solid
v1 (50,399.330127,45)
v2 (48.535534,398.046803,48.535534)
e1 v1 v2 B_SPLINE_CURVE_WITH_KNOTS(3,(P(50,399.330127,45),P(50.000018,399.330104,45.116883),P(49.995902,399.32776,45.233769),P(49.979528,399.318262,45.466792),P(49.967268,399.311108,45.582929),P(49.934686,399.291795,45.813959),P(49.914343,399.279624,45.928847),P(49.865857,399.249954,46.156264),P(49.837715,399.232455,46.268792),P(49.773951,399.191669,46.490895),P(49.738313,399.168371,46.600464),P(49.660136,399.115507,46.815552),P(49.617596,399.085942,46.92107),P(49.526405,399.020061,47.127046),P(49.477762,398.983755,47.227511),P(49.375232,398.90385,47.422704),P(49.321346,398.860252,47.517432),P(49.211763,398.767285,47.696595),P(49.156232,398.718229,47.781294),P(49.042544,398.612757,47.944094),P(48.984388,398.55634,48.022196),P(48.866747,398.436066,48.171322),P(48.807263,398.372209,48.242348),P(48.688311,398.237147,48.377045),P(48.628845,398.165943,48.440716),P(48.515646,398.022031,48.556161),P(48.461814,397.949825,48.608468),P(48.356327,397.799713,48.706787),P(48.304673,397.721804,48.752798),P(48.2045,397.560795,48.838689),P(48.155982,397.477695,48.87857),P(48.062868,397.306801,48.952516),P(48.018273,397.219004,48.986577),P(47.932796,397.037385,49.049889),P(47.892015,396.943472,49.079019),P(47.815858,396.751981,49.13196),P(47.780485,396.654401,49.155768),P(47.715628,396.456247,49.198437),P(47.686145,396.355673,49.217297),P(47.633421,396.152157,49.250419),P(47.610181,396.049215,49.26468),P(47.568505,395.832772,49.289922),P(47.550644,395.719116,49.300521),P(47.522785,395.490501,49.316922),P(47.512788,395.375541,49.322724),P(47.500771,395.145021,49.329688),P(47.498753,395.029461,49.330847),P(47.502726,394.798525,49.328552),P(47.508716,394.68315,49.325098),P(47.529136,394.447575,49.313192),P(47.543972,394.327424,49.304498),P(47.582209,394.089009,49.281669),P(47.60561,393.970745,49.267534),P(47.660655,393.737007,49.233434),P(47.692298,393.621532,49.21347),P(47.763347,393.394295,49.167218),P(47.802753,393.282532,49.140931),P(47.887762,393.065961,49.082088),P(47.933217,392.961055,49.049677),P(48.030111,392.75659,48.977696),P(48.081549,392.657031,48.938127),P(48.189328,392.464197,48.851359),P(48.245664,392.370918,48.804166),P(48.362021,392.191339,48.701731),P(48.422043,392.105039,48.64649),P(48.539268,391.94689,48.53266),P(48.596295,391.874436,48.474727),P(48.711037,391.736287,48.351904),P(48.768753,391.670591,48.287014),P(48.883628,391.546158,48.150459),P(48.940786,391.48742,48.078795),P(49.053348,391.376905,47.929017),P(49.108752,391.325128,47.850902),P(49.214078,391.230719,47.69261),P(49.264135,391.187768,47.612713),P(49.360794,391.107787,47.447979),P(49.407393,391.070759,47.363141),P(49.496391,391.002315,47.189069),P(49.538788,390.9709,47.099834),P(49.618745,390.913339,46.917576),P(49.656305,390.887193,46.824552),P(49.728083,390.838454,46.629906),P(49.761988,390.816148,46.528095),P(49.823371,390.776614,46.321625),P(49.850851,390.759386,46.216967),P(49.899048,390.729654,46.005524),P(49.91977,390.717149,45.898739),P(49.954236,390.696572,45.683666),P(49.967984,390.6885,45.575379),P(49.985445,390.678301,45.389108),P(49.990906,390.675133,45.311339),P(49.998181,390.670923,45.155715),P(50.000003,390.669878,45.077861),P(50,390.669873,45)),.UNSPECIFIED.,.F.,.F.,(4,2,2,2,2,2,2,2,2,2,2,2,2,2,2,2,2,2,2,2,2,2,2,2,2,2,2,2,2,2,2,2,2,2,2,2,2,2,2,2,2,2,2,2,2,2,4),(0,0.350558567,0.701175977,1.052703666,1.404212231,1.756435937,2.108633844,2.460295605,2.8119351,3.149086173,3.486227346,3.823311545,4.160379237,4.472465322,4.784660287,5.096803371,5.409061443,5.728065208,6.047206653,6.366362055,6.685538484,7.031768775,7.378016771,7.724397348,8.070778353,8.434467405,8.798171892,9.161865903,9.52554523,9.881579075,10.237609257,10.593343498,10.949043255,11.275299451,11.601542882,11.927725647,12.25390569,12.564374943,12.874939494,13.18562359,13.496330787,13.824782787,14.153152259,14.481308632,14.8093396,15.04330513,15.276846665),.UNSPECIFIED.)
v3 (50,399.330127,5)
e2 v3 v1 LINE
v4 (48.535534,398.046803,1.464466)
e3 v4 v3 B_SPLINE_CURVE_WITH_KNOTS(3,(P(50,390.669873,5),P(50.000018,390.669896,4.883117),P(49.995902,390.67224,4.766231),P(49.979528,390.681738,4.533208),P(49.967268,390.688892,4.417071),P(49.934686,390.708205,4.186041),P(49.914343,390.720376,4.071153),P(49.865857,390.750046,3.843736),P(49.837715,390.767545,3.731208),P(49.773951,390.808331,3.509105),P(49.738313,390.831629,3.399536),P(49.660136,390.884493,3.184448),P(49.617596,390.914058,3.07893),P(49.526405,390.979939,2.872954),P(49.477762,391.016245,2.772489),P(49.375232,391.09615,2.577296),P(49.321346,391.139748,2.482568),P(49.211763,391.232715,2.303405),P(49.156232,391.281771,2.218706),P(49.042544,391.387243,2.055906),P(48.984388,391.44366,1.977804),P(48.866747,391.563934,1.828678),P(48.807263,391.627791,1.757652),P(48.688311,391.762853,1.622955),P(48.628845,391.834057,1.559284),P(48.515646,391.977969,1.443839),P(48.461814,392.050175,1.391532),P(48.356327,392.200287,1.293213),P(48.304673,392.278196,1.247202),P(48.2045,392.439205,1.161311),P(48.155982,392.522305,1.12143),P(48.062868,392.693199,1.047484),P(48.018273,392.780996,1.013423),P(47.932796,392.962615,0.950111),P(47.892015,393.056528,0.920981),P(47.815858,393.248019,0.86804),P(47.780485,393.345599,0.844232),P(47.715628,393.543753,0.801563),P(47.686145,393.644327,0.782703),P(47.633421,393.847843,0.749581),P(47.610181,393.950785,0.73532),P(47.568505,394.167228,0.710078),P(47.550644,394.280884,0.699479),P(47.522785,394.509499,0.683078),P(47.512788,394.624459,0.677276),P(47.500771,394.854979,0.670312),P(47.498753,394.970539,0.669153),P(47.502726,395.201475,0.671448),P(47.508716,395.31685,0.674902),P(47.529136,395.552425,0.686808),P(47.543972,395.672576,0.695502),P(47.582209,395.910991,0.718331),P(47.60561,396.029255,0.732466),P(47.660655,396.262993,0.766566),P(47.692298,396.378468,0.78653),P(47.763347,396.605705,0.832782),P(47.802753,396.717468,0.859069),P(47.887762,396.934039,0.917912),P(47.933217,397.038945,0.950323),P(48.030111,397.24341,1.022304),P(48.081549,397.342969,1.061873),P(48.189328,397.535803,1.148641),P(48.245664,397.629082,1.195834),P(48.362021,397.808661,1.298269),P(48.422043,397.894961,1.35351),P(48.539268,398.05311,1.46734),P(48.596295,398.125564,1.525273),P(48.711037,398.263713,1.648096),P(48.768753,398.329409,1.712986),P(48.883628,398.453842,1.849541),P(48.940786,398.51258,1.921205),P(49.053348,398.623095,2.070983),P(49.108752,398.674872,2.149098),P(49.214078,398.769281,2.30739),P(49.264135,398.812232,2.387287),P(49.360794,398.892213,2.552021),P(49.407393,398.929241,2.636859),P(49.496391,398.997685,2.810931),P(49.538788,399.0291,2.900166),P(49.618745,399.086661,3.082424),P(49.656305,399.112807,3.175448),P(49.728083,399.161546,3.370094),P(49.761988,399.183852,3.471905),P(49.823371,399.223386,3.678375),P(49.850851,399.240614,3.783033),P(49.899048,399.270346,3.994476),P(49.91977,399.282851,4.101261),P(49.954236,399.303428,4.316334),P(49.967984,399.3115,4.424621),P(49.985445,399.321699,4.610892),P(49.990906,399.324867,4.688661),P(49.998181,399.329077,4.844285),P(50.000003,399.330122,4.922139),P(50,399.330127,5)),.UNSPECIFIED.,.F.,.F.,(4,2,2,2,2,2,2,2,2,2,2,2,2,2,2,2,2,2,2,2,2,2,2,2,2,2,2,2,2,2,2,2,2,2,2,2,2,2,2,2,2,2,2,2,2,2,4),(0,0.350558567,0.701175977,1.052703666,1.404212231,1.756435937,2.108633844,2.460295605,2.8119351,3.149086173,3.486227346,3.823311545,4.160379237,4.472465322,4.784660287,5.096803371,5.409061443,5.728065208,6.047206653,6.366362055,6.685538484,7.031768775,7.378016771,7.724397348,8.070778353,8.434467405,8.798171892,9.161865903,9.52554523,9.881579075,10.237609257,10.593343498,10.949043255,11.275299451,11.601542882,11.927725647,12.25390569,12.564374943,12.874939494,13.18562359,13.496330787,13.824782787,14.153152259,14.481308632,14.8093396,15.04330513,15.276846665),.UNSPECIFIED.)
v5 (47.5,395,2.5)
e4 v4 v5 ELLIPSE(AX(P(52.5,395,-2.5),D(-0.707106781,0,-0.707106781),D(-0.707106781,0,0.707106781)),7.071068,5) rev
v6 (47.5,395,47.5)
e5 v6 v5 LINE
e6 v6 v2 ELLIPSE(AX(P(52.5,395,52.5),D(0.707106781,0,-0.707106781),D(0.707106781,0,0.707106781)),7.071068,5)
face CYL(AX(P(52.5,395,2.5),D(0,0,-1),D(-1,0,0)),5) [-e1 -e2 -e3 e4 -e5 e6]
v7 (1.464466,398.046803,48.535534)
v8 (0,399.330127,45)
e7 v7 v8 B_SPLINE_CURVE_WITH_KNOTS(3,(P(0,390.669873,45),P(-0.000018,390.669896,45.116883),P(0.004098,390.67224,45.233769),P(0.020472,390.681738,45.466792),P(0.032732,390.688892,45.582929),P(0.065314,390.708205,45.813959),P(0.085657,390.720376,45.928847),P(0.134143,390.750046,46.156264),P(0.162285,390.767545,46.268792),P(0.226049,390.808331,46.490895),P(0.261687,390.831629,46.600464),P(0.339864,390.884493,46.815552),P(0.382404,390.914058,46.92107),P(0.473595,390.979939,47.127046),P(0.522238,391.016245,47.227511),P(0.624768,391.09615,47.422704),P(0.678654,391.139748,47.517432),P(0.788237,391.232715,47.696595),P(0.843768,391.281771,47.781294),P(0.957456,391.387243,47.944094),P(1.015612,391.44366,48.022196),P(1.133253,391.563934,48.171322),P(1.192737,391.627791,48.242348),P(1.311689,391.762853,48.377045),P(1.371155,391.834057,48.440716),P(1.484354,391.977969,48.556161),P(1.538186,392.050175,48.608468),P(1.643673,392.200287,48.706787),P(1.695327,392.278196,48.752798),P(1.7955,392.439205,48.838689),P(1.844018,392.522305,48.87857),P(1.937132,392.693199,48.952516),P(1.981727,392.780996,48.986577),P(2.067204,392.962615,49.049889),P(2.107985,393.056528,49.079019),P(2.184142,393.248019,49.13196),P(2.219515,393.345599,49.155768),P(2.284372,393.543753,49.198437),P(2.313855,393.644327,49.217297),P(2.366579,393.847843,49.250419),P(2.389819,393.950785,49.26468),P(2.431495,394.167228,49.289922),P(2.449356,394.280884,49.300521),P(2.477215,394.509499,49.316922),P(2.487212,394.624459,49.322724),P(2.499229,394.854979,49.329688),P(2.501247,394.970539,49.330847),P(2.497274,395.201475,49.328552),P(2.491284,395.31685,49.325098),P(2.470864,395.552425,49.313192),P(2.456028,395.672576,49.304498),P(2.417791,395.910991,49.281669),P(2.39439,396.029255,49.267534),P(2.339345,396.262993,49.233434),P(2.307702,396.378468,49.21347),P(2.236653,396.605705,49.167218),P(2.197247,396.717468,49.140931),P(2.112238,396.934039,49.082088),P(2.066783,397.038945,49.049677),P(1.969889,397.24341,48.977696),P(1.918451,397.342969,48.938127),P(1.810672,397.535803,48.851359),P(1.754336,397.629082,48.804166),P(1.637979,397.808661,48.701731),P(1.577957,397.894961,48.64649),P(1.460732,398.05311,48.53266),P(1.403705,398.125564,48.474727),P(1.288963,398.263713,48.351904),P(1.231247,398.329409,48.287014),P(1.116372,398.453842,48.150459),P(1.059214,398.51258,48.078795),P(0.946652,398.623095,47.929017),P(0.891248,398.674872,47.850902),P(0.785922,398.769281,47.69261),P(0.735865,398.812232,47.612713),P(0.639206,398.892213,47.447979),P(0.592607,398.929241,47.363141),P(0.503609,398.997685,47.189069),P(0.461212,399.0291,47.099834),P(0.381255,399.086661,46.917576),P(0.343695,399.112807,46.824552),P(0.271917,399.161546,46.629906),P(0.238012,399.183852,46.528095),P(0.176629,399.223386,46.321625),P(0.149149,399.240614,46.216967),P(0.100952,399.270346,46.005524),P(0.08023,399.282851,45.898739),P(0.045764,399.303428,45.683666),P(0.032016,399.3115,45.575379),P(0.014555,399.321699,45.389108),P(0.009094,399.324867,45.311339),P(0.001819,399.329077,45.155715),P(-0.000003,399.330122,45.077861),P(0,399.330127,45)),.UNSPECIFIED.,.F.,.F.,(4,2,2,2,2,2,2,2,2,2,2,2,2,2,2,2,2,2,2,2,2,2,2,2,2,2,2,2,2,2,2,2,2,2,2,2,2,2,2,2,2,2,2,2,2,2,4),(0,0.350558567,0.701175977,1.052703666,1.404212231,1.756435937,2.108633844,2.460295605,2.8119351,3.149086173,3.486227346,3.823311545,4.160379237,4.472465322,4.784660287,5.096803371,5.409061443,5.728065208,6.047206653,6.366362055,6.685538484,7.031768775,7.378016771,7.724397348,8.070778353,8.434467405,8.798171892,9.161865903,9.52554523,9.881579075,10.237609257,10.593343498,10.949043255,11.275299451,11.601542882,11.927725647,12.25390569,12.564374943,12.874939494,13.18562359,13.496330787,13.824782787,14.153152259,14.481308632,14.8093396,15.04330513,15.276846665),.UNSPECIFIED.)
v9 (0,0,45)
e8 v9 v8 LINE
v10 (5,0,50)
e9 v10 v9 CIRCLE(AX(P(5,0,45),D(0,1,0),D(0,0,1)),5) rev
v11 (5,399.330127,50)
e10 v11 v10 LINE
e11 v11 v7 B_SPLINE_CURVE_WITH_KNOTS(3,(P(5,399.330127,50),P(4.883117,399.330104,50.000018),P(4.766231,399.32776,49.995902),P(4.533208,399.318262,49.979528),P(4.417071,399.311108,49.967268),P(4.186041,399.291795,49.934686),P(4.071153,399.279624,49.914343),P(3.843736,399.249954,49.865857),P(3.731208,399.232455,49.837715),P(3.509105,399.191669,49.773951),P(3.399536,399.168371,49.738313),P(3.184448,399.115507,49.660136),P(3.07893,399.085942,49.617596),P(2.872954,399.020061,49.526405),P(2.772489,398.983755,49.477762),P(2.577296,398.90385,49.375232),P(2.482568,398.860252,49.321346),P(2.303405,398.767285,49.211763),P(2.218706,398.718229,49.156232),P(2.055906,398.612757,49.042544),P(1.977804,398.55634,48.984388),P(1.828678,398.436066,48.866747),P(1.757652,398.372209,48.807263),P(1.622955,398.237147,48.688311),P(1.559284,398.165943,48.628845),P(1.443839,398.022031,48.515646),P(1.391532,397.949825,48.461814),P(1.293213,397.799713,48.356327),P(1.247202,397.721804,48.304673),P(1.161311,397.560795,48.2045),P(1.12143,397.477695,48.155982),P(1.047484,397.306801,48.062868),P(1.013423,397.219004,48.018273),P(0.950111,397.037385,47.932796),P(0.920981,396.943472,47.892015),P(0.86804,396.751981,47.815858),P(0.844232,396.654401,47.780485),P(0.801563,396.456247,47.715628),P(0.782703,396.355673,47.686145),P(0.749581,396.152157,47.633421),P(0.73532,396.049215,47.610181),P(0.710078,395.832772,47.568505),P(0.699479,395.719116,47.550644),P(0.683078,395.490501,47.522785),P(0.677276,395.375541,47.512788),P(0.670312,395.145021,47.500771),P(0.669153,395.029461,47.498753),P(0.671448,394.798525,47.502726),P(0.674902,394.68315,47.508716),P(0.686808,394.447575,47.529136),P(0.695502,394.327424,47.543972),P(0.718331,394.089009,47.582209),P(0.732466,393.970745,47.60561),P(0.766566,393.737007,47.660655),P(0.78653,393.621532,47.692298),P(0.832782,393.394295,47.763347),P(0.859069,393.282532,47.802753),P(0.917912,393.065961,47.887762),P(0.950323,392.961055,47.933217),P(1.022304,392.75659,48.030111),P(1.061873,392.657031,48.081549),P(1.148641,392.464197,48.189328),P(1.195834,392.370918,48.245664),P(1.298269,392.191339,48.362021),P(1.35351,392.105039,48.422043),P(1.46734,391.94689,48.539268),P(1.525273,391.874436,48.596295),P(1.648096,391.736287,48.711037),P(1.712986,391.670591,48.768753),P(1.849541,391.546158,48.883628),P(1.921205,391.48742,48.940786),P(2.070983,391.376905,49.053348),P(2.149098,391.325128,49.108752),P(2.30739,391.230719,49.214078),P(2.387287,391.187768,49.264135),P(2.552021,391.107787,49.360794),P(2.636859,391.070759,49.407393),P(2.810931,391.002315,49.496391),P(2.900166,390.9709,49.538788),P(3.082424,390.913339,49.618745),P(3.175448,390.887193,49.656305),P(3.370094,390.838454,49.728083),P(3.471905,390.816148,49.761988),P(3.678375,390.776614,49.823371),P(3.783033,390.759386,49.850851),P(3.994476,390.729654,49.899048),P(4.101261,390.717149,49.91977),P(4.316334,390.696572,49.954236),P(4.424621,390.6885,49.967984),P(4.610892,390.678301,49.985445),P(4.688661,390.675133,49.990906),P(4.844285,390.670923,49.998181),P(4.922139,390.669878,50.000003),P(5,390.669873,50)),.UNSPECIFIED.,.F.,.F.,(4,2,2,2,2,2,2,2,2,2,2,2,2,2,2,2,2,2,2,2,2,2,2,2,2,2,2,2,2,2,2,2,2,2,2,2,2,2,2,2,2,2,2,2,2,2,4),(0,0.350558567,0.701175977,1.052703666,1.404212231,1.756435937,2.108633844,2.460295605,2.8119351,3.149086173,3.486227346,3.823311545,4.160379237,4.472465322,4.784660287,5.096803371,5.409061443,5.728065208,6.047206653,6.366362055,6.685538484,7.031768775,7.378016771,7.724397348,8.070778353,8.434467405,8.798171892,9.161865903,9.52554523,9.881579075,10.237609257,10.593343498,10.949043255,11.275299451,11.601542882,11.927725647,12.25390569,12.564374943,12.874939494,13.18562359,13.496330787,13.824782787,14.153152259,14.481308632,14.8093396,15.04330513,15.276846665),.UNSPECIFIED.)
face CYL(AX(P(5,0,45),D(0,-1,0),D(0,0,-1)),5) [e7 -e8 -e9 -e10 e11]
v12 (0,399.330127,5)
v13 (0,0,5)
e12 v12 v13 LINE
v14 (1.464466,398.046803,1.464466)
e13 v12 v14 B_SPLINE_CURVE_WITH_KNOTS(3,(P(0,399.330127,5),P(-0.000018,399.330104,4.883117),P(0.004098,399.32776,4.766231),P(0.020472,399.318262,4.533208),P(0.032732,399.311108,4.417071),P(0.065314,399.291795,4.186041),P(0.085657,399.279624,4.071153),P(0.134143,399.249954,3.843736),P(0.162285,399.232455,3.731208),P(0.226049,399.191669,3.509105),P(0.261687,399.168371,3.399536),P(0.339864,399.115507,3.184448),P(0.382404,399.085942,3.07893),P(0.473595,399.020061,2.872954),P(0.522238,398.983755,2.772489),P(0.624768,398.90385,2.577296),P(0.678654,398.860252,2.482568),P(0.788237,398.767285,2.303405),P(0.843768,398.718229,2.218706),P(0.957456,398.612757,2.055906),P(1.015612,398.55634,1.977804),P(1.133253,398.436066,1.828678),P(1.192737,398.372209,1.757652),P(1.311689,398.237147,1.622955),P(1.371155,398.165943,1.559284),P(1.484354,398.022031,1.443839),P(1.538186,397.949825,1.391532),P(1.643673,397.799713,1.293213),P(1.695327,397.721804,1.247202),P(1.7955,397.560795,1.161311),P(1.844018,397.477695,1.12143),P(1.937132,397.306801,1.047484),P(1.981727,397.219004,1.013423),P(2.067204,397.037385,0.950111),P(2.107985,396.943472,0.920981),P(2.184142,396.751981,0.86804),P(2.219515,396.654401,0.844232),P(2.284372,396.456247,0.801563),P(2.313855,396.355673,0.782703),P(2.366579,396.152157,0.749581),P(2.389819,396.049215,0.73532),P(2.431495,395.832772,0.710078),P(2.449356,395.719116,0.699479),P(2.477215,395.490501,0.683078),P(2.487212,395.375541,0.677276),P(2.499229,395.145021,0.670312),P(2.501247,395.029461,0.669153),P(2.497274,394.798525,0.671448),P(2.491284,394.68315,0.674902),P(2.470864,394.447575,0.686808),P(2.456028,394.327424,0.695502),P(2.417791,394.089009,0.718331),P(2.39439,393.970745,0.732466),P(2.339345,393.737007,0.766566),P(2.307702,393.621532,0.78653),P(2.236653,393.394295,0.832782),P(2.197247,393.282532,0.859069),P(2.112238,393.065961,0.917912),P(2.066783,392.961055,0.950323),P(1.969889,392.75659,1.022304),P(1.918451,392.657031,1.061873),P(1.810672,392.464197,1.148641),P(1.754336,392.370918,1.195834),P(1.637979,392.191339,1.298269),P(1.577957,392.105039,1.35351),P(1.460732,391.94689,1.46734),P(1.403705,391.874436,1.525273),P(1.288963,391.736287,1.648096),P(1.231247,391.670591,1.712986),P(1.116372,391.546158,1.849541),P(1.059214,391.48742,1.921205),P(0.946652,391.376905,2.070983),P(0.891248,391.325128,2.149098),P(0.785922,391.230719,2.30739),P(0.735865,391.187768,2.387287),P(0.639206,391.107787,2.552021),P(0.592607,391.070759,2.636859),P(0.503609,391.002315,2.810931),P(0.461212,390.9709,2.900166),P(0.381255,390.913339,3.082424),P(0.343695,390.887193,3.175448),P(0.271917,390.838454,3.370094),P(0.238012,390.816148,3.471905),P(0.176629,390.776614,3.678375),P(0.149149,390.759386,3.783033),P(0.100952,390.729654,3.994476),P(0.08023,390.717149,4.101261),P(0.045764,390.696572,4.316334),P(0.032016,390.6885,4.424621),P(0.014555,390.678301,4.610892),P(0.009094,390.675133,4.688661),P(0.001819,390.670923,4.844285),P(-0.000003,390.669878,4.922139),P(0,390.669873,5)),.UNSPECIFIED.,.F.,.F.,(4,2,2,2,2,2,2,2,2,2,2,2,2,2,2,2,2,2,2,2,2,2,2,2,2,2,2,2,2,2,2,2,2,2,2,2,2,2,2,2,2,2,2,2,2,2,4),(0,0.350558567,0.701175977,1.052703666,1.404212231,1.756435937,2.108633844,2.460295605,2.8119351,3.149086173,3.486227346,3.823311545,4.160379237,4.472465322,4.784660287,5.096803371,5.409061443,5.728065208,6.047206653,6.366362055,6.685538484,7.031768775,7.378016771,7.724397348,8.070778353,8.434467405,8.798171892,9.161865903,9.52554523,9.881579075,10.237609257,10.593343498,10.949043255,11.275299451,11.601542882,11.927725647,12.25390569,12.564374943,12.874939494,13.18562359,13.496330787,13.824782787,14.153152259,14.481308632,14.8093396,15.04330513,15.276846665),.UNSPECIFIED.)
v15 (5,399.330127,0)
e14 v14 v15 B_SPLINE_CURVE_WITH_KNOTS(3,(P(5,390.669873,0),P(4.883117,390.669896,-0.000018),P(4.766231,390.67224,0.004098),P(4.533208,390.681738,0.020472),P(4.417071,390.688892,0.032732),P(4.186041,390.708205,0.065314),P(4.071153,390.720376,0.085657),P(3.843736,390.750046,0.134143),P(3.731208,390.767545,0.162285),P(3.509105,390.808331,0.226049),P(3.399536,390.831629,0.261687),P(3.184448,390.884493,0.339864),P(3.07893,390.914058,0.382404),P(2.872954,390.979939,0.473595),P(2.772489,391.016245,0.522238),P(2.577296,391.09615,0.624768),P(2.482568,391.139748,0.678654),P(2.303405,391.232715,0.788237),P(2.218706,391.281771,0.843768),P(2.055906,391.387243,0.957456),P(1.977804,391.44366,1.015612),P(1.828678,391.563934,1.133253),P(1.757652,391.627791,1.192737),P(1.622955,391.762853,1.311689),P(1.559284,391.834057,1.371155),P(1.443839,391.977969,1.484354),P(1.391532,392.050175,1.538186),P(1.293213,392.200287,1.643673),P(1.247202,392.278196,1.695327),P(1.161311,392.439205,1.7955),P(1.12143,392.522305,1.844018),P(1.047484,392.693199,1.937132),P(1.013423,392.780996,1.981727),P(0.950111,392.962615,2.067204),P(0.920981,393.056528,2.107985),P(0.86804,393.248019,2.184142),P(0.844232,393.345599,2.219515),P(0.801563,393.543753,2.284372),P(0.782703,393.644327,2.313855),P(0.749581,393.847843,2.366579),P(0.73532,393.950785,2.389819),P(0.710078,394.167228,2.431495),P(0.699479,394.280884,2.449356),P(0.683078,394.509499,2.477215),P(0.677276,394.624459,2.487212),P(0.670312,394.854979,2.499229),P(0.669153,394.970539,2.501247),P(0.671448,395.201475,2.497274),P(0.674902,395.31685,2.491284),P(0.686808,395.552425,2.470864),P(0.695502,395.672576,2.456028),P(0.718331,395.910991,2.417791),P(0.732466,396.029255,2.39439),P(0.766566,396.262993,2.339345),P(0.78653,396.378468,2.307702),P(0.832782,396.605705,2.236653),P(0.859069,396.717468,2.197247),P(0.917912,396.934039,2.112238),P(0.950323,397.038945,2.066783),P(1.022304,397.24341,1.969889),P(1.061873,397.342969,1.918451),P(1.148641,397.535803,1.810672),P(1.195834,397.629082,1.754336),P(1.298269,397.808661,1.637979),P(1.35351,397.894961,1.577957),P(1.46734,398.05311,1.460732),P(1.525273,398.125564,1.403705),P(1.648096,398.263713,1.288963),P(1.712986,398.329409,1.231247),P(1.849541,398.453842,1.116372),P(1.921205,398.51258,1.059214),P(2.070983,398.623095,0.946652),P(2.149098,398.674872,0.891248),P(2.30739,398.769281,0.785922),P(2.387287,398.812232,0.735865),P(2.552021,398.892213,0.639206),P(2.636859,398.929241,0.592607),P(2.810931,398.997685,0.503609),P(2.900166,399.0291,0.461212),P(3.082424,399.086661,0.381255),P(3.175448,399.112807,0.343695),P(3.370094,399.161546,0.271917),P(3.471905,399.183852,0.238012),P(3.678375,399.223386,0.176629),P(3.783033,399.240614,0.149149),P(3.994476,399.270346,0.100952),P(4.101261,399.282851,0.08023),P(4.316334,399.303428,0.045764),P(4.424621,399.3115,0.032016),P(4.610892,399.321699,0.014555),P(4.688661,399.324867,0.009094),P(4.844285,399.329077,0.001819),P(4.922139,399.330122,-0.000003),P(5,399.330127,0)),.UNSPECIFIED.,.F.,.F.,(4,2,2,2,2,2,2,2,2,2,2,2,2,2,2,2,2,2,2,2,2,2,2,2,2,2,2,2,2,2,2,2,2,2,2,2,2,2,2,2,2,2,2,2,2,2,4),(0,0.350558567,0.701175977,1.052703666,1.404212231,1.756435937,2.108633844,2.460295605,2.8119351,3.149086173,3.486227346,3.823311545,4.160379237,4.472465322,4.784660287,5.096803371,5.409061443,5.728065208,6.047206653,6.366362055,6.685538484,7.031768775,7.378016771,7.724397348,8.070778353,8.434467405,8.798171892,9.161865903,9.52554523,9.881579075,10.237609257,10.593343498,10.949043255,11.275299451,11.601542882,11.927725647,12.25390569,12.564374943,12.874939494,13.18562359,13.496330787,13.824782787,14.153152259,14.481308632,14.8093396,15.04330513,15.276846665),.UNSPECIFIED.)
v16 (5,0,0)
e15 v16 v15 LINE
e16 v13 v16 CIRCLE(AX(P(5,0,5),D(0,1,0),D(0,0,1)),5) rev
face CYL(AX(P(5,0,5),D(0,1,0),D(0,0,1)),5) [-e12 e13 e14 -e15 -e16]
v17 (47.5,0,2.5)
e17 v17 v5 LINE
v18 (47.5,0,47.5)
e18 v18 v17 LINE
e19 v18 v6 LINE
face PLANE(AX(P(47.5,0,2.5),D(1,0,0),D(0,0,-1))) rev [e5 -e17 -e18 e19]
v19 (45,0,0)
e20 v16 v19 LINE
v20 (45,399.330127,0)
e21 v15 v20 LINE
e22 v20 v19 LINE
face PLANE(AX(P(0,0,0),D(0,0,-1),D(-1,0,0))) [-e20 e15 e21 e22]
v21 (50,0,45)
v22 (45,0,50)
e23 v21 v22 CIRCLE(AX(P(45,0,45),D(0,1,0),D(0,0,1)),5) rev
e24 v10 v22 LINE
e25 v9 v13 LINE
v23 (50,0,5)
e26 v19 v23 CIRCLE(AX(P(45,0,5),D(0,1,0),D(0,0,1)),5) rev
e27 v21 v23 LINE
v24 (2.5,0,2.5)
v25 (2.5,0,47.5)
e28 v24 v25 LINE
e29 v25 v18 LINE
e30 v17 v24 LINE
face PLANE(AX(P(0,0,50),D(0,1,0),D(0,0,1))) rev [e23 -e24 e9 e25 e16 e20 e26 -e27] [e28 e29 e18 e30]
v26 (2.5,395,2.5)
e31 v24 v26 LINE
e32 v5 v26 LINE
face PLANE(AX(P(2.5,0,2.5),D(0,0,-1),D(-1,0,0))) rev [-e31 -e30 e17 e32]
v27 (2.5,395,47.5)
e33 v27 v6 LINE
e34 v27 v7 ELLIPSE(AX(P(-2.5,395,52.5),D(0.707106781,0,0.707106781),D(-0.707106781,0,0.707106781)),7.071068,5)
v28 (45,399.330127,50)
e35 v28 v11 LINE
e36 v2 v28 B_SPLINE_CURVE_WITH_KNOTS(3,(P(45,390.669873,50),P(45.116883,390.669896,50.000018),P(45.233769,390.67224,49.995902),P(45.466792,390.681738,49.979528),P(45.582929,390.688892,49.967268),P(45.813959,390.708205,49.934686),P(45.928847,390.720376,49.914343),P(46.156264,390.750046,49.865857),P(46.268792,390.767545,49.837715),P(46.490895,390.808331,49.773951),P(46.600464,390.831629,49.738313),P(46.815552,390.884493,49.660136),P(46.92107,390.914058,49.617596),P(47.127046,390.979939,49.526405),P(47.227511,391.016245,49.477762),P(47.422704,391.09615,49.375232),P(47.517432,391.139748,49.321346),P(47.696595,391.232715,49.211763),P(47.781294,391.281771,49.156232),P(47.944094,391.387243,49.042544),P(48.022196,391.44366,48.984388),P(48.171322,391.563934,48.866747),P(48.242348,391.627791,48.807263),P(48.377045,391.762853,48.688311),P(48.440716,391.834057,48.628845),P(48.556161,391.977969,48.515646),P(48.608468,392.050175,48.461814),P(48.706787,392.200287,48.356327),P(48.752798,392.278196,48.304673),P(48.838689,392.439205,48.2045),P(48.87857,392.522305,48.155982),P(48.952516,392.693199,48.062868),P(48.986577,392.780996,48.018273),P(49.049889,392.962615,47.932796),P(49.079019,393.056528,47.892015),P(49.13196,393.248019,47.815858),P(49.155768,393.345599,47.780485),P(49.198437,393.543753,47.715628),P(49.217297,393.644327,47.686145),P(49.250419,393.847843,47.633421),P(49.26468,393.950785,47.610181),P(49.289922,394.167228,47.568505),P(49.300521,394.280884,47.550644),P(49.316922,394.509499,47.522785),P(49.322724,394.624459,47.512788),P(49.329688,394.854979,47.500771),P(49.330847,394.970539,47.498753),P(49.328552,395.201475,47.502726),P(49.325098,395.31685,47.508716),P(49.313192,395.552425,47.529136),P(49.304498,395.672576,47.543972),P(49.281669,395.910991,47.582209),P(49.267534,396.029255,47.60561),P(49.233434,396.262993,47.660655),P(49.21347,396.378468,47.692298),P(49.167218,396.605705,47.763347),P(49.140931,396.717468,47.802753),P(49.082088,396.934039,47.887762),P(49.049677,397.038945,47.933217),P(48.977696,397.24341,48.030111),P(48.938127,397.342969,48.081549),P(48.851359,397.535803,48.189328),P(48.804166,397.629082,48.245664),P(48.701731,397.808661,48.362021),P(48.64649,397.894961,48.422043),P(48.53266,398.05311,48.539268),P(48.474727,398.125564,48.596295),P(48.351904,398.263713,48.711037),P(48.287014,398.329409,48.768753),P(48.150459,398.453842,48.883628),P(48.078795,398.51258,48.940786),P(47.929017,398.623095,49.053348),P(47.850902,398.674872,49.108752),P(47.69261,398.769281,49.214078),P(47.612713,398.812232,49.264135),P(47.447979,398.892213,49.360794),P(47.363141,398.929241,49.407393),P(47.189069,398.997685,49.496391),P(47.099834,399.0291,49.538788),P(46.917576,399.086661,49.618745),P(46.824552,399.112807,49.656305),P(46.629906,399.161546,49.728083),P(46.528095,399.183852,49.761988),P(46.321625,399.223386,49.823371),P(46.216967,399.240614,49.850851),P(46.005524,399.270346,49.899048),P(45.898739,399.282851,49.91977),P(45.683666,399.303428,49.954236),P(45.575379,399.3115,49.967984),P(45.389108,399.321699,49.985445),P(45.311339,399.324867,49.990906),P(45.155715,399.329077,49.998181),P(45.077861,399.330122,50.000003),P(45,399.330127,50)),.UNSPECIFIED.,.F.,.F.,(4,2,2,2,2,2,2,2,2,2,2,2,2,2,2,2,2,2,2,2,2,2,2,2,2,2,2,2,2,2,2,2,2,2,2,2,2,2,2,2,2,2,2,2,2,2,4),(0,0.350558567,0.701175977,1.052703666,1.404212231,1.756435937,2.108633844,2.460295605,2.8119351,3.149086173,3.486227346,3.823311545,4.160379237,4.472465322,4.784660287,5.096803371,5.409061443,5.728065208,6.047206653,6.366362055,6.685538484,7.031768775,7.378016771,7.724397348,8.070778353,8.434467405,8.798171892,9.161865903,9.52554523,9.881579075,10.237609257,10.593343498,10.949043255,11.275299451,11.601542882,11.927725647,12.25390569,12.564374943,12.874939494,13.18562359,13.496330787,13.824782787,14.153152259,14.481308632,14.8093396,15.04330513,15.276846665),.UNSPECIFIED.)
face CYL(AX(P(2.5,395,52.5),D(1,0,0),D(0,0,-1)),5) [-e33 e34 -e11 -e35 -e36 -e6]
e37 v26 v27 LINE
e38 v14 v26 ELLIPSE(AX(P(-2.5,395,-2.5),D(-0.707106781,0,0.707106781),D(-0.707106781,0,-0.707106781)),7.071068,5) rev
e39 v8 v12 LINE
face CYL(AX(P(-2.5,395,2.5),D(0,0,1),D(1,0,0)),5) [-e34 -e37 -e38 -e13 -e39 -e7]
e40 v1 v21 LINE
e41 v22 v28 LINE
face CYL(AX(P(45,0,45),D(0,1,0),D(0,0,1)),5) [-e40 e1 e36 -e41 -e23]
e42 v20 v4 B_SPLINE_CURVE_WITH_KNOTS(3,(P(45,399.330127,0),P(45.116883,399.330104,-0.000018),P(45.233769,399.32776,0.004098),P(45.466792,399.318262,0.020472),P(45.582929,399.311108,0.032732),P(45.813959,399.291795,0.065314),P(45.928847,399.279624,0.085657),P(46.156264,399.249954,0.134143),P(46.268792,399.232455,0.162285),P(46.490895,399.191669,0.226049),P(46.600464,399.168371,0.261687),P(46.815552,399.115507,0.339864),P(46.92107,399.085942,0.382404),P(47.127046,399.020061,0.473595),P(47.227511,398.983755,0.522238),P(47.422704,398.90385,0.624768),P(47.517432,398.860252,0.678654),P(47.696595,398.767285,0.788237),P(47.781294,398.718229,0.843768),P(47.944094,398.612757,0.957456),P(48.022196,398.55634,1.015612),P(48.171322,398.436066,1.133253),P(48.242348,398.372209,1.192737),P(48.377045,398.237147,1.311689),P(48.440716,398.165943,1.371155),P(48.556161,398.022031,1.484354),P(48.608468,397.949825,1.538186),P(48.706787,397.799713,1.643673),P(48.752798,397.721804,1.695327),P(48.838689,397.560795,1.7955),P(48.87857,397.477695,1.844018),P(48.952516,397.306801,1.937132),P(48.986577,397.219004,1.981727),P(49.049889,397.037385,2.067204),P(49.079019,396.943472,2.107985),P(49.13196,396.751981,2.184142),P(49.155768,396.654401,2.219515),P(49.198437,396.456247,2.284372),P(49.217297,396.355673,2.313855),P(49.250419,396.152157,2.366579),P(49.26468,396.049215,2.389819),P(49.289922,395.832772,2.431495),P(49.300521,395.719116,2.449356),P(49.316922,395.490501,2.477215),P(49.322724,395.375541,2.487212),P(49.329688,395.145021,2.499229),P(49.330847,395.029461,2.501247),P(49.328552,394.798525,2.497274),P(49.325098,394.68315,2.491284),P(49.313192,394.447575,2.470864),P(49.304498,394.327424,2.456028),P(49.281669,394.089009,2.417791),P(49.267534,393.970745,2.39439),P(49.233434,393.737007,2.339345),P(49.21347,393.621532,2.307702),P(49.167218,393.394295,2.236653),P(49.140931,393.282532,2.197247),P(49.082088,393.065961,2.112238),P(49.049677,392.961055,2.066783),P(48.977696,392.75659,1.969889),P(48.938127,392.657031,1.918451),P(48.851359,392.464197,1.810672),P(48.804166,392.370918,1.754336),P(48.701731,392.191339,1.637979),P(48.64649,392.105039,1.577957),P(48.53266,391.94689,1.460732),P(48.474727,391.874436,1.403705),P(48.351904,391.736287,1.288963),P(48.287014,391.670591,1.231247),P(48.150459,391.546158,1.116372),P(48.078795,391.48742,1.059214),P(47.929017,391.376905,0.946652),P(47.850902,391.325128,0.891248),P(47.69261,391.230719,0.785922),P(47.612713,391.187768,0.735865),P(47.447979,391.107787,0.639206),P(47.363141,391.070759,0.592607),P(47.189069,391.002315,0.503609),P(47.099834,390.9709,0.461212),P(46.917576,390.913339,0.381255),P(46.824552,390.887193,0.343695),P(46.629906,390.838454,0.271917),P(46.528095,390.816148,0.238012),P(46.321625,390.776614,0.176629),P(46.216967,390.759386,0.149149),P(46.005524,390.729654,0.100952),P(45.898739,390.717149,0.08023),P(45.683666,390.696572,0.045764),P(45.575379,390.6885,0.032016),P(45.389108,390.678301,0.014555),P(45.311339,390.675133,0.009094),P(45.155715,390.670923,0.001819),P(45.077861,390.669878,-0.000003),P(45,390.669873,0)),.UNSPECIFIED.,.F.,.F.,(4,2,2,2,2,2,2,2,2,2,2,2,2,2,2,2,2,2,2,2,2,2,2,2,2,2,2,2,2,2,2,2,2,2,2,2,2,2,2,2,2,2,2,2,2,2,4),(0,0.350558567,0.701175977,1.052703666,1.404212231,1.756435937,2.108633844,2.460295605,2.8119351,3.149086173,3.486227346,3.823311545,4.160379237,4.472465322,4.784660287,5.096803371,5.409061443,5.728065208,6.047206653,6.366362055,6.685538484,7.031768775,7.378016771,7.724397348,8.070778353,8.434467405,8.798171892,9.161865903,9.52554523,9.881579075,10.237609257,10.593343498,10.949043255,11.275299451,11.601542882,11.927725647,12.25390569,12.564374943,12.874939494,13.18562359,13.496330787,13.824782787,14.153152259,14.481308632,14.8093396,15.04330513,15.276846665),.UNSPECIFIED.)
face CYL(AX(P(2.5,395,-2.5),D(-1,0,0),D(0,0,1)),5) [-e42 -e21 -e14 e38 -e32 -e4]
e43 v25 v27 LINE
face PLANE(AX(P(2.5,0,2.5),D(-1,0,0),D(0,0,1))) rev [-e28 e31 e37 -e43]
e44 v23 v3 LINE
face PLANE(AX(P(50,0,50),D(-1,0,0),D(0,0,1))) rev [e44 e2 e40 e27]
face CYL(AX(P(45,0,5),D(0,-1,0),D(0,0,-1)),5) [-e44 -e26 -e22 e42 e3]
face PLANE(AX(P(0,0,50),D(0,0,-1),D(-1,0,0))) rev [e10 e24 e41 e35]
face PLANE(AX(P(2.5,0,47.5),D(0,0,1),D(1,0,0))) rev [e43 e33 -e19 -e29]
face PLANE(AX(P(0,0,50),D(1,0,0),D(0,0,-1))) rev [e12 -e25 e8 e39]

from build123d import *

# Parameters (mm, degrees)
SKETCH1_W           = 50
SKETCH1_H           = 400
BOSS_EXTRUDE1_DEPTH = 50
SKETCH2_W           = 45
SKETCH2_H           = 45
CUT_EXTRUDE1_DEPTH  = 407.201920232
FILLET1_R           = 5
FILLET2_R           = 5


with BuildPart() as part:
    # Sketch1 → Boss-Extrude1 (new body)
    with BuildSketch(Plane.XY):
        with Locations((25, 200)):
            Rectangle(SKETCH1_W, SKETCH1_H)
    extrude(amount=BOSS_EXTRUDE1_DEPTH)

    # Sketch2 → Cut-Extrude1 (cut, through all)
    with BuildSketch(Plane(origin=(0, 400, 0), x_dir=(1, 0, 0), z_dir=(0, 1, 0))):
        with Locations((25, -25)):
            Rectangle(SKETCH2_W, SKETCH2_H)
    extrude(amount=-CUT_EXTRUDE1_DEPTH, mode=Mode.SUBTRACT)

    # Fillet1
    fillet1_edges = [part.edges().sort_by_distance(p)[0] for p in [
        (50, 200, 50),
        (0, 200, 50),
        (50, 200, 0),
        (0, 200, 0),
    ]]
    fillet(fillet1_edges, radius=FILLET1_R)

    # Fillet2
    # the kernel refuses this fillet: 5 mm, written as the material it takes off along each edge
    with BuildSketch(Plane(origin=(47.5, 400, 2.5), x_dir=(0, -1, 0), z_dir=(0, 0, 1)), Plane(origin=(47.5, 400, 47.5), x_dir=(0, -1, 0), z_dir=(-1, 0, 0)), Plane(origin=(2.5, 400, 47.5), x_dir=(0, -1, 0), z_dir=(0, 0, -1)), Plane(origin=(2.5, 400, 2.5), x_dir=(0, -1, 0), z_dir=(1, 0, 0))) as fillet2_piece_1:
        with BuildLine():
            CenterArc((FILLET2_R, FILLET2_R), FILLET2_R, 180, 90)
            Line((0, FILLET2_R), (-FILLET2_R * 0.02, FILLET2_R))
            Line((-FILLET2_R * 0.02, FILLET2_R), (-FILLET2_R * 0.02, -FILLET2_R * 0.02))
            Line((-FILLET2_R * 0.02, -FILLET2_R * 0.02), (FILLET2_R, -FILLET2_R * 0.02))
            Line((FILLET2_R, -FILLET2_R * 0.02), (FILLET2_R, 0))
        make_face()
    extrude(amount=45, mode=Mode.SUBTRACT)
    with BuildSketch(Plane(origin=(47.5, 400, -10), x_dir=(0, -1, 0), z_dir=(0, 0, 1))) as fillet2_piece_2a_section:
        with BuildLine():
            CenterArc((FILLET2_R, FILLET2_R), FILLET2_R, 180, 90)
            Line((0, FILLET2_R), (-FILLET2_R * 0.02, FILLET2_R))
            Line((-FILLET2_R * 0.02, FILLET2_R), (-FILLET2_R * 0.02, -FILLET2_R * 0.02))
            Line((-FILLET2_R * 0.02, -FILLET2_R * 0.02), (FILLET2_R, -FILLET2_R * 0.02))
            Line((FILLET2_R, -FILLET2_R * 0.02), (FILLET2_R, 0))
        make_face()
    fillet2_piece_2a = extrude(amount=57.5, mode=Mode.PRIVATE)
    fillet2_piece_2a = split(fillet2_piece_2a, bisect_by=Plane(origin=(48.631975571, 398.868024429, 2.5), z_dir=(0, 0, -1)), keep=Keep.TOP, mode=Mode.PRIVATE)
    with BuildSketch(Plane(origin=(2.5, 400, 2.5), x_dir=(0, -1, 0), z_dir=(1, 0, 0))) as fillet2_piece_2b_section:
        with BuildLine():
            CenterArc((FILLET2_R, FILLET2_R), FILLET2_R, 180, 90)
            Line((0, FILLET2_R), (-FILLET2_R * 0.02, FILLET2_R))
            Line((-FILLET2_R * 0.02, FILLET2_R), (-FILLET2_R * 0.02, -FILLET2_R * 0.02))
            Line((-FILLET2_R * 0.02, -FILLET2_R * 0.02), (FILLET2_R, -FILLET2_R * 0.02))
            Line((FILLET2_R, -FILLET2_R * 0.02), (FILLET2_R, 0))
        make_face()
    fillet2_piece_2b = extrude(amount=57.5, mode=Mode.PRIVATE)
    fillet2_piece_2b = split(fillet2_piece_2b, bisect_by=Plane(origin=(47.5, 398.868024429, 1.368024429), z_dir=(1, 0, 0)), keep=Keep.TOP, mode=Mode.PRIVATE)
    fillet2_piece_2 = fillet2_piece_2a & fillet2_piece_2b
    add(fillet2_piece_2, mode=Mode.SUBTRACT)
    with BuildSketch(Plane(origin=(60, 400, 47.5), x_dir=(0, -1, 0), z_dir=(-1, 0, 0))) as fillet2_piece_3a_section:
        with BuildLine():
            CenterArc((FILLET2_R, FILLET2_R), FILLET2_R, 180, 90)
            Line((0, FILLET2_R), (-FILLET2_R * 0.02, FILLET2_R))
            Line((-FILLET2_R * 0.02, FILLET2_R), (-FILLET2_R * 0.02, -FILLET2_R * 0.02))
            Line((-FILLET2_R * 0.02, -FILLET2_R * 0.02), (FILLET2_R, -FILLET2_R * 0.02))
            Line((FILLET2_R, -FILLET2_R * 0.02), (FILLET2_R, 0))
        make_face()
    fillet2_piece_3a = extrude(amount=57.5, mode=Mode.PRIVATE)
    fillet2_piece_3a = split(fillet2_piece_3a, bisect_by=Plane(origin=(47.5, 398.868024429, 48.631975571), z_dir=(1, 0, 0)), keep=Keep.TOP, mode=Mode.PRIVATE)
    with BuildSketch(Plane(origin=(47.5, 400, 2.5), x_dir=(0, -1, 0), z_dir=(0, 0, 1))) as fillet2_piece_3b_section:
        with BuildLine():
            CenterArc((FILLET2_R, FILLET2_R), FILLET2_R, 180, 90)
            Line((0, FILLET2_R), (-FILLET2_R * 0.02, FILLET2_R))
            Line((-FILLET2_R * 0.02, FILLET2_R), (-FILLET2_R * 0.02, -FILLET2_R * 0.02))
            Line((-FILLET2_R * 0.02, -FILLET2_R * 0.02), (FILLET2_R, -FILLET2_R * 0.02))
            Line((FILLET2_R, -FILLET2_R * 0.02), (FILLET2_R, 0))
        make_face()
    fillet2_piece_3b = extrude(amount=57.5, mode=Mode.PRIVATE)
    fillet2_piece_3b = split(fillet2_piece_3b, bisect_by=Plane(origin=(48.631975571, 398.868024429, 47.5), z_dir=(0, 0, 1)), keep=Keep.TOP, mode=Mode.PRIVATE)
    fillet2_piece_3 = fillet2_piece_3a & fillet2_piece_3b
    add(fillet2_piece_3, mode=Mode.SUBTRACT)
    with BuildSketch(Plane(origin=(2.5, 400, 60), x_dir=(0, -1, 0), z_dir=(0, 0, -1))) as fillet2_piece_4a_section:
        with BuildLine():
            CenterArc((FILLET2_R, FILLET2_R), FILLET2_R, 180, 90)
            Line((0, FILLET2_R), (-FILLET2_R * 0.02, FILLET2_R))
            Line((-FILLET2_R * 0.02, FILLET2_R), (-FILLET2_R * 0.02, -FILLET2_R * 0.02))
            Line((-FILLET2_R * 0.02, -FILLET2_R * 0.02), (FILLET2_R, -FILLET2_R * 0.02))
            Line((FILLET2_R, -FILLET2_R * 0.02), (FILLET2_R, 0))
        make_face()
    fillet2_piece_4a = extrude(amount=57.5, mode=Mode.PRIVATE)
    fillet2_piece_4a = split(fillet2_piece_4a, bisect_by=Plane(origin=(1.368024429, 398.868024429, 47.5), z_dir=(0, 0, 1)), keep=Keep.TOP, mode=Mode.PRIVATE)
    with BuildSketch(Plane(origin=(47.5, 400, 47.5), x_dir=(0, -1, 0), z_dir=(-1, 0, 0))) as fillet2_piece_4b_section:
        with BuildLine():
            CenterArc((FILLET2_R, FILLET2_R), FILLET2_R, 180, 90)
            Line((0, FILLET2_R), (-FILLET2_R * 0.02, FILLET2_R))
            Line((-FILLET2_R * 0.02, FILLET2_R), (-FILLET2_R * 0.02, -FILLET2_R * 0.02))
            Line((-FILLET2_R * 0.02, -FILLET2_R * 0.02), (FILLET2_R, -FILLET2_R * 0.02))
            Line((FILLET2_R, -FILLET2_R * 0.02), (FILLET2_R, 0))
        make_face()
    fillet2_piece_4b = extrude(amount=57.5, mode=Mode.PRIVATE)
    fillet2_piece_4b = split(fillet2_piece_4b, bisect_by=Plane(origin=(2.5, 398.868024429, 48.631975571), z_dir=(-1, 0, 0)), keep=Keep.TOP, mode=Mode.PRIVATE)
    fillet2_piece_4 = fillet2_piece_4a & fillet2_piece_4b
    add(fillet2_piece_4, mode=Mode.SUBTRACT)
    with BuildSketch(Plane(origin=(2.5, 400, 47.5), x_dir=(0, -1, 0), z_dir=(0, 0, -1))) as fillet2_piece_5a_section:
        with BuildLine():
            CenterArc((FILLET2_R, FILLET2_R), FILLET2_R, 180, 90)
            Line((0, FILLET2_R), (-FILLET2_R * 0.02, FILLET2_R))
            Line((-FILLET2_R * 0.02, FILLET2_R), (-FILLET2_R * 0.02, -FILLET2_R * 0.02))
            Line((-FILLET2_R * 0.02, -FILLET2_R * 0.02), (FILLET2_R, -FILLET2_R * 0.02))
            Line((FILLET2_R, -FILLET2_R * 0.02), (FILLET2_R, 0))
        make_face()
    fillet2_piece_5a = extrude(amount=57.5, mode=Mode.PRIVATE)
    fillet2_piece_5a = split(fillet2_piece_5a, bisect_by=Plane(origin=(1.368024429, 398.868024429, 2.5), z_dir=(0, 0, -1)), keep=Keep.TOP, mode=Mode.PRIVATE)
    with BuildSketch(Plane(origin=(-10, 400, 2.5), x_dir=(0, -1, 0), z_dir=(1, 0, 0))) as fillet2_piece_5b_section:
        with BuildLine():
            CenterArc((FILLET2_R, FILLET2_R), FILLET2_R, 180, 90)
            Line((0, FILLET2_R), (-FILLET2_R * 0.02, FILLET2_R))
            Line((-FILLET2_R * 0.02, FILLET2_R), (-FILLET2_R * 0.02, -FILLET2_R * 0.02))
            Line((-FILLET2_R * 0.02, -FILLET2_R * 0.02), (FILLET2_R, -FILLET2_R * 0.02))
            Line((FILLET2_R, -FILLET2_R * 0.02), (FILLET2_R, 0))
        make_face()
    fillet2_piece_5b = extrude(amount=57.5, mode=Mode.PRIVATE)
    fillet2_piece_5b = split(fillet2_piece_5b, bisect_by=Plane(origin=(2.5, 398.868024429, 1.368024429), z_dir=(-1, 0, 0)), keep=Keep.TOP, mode=Mode.PRIVATE)
    fillet2_piece_5 = fillet2_piece_5a & fillet2_piece_5b
    add(fillet2_piece_5, mode=Mode.SUBTRACT)


solid = part.part
